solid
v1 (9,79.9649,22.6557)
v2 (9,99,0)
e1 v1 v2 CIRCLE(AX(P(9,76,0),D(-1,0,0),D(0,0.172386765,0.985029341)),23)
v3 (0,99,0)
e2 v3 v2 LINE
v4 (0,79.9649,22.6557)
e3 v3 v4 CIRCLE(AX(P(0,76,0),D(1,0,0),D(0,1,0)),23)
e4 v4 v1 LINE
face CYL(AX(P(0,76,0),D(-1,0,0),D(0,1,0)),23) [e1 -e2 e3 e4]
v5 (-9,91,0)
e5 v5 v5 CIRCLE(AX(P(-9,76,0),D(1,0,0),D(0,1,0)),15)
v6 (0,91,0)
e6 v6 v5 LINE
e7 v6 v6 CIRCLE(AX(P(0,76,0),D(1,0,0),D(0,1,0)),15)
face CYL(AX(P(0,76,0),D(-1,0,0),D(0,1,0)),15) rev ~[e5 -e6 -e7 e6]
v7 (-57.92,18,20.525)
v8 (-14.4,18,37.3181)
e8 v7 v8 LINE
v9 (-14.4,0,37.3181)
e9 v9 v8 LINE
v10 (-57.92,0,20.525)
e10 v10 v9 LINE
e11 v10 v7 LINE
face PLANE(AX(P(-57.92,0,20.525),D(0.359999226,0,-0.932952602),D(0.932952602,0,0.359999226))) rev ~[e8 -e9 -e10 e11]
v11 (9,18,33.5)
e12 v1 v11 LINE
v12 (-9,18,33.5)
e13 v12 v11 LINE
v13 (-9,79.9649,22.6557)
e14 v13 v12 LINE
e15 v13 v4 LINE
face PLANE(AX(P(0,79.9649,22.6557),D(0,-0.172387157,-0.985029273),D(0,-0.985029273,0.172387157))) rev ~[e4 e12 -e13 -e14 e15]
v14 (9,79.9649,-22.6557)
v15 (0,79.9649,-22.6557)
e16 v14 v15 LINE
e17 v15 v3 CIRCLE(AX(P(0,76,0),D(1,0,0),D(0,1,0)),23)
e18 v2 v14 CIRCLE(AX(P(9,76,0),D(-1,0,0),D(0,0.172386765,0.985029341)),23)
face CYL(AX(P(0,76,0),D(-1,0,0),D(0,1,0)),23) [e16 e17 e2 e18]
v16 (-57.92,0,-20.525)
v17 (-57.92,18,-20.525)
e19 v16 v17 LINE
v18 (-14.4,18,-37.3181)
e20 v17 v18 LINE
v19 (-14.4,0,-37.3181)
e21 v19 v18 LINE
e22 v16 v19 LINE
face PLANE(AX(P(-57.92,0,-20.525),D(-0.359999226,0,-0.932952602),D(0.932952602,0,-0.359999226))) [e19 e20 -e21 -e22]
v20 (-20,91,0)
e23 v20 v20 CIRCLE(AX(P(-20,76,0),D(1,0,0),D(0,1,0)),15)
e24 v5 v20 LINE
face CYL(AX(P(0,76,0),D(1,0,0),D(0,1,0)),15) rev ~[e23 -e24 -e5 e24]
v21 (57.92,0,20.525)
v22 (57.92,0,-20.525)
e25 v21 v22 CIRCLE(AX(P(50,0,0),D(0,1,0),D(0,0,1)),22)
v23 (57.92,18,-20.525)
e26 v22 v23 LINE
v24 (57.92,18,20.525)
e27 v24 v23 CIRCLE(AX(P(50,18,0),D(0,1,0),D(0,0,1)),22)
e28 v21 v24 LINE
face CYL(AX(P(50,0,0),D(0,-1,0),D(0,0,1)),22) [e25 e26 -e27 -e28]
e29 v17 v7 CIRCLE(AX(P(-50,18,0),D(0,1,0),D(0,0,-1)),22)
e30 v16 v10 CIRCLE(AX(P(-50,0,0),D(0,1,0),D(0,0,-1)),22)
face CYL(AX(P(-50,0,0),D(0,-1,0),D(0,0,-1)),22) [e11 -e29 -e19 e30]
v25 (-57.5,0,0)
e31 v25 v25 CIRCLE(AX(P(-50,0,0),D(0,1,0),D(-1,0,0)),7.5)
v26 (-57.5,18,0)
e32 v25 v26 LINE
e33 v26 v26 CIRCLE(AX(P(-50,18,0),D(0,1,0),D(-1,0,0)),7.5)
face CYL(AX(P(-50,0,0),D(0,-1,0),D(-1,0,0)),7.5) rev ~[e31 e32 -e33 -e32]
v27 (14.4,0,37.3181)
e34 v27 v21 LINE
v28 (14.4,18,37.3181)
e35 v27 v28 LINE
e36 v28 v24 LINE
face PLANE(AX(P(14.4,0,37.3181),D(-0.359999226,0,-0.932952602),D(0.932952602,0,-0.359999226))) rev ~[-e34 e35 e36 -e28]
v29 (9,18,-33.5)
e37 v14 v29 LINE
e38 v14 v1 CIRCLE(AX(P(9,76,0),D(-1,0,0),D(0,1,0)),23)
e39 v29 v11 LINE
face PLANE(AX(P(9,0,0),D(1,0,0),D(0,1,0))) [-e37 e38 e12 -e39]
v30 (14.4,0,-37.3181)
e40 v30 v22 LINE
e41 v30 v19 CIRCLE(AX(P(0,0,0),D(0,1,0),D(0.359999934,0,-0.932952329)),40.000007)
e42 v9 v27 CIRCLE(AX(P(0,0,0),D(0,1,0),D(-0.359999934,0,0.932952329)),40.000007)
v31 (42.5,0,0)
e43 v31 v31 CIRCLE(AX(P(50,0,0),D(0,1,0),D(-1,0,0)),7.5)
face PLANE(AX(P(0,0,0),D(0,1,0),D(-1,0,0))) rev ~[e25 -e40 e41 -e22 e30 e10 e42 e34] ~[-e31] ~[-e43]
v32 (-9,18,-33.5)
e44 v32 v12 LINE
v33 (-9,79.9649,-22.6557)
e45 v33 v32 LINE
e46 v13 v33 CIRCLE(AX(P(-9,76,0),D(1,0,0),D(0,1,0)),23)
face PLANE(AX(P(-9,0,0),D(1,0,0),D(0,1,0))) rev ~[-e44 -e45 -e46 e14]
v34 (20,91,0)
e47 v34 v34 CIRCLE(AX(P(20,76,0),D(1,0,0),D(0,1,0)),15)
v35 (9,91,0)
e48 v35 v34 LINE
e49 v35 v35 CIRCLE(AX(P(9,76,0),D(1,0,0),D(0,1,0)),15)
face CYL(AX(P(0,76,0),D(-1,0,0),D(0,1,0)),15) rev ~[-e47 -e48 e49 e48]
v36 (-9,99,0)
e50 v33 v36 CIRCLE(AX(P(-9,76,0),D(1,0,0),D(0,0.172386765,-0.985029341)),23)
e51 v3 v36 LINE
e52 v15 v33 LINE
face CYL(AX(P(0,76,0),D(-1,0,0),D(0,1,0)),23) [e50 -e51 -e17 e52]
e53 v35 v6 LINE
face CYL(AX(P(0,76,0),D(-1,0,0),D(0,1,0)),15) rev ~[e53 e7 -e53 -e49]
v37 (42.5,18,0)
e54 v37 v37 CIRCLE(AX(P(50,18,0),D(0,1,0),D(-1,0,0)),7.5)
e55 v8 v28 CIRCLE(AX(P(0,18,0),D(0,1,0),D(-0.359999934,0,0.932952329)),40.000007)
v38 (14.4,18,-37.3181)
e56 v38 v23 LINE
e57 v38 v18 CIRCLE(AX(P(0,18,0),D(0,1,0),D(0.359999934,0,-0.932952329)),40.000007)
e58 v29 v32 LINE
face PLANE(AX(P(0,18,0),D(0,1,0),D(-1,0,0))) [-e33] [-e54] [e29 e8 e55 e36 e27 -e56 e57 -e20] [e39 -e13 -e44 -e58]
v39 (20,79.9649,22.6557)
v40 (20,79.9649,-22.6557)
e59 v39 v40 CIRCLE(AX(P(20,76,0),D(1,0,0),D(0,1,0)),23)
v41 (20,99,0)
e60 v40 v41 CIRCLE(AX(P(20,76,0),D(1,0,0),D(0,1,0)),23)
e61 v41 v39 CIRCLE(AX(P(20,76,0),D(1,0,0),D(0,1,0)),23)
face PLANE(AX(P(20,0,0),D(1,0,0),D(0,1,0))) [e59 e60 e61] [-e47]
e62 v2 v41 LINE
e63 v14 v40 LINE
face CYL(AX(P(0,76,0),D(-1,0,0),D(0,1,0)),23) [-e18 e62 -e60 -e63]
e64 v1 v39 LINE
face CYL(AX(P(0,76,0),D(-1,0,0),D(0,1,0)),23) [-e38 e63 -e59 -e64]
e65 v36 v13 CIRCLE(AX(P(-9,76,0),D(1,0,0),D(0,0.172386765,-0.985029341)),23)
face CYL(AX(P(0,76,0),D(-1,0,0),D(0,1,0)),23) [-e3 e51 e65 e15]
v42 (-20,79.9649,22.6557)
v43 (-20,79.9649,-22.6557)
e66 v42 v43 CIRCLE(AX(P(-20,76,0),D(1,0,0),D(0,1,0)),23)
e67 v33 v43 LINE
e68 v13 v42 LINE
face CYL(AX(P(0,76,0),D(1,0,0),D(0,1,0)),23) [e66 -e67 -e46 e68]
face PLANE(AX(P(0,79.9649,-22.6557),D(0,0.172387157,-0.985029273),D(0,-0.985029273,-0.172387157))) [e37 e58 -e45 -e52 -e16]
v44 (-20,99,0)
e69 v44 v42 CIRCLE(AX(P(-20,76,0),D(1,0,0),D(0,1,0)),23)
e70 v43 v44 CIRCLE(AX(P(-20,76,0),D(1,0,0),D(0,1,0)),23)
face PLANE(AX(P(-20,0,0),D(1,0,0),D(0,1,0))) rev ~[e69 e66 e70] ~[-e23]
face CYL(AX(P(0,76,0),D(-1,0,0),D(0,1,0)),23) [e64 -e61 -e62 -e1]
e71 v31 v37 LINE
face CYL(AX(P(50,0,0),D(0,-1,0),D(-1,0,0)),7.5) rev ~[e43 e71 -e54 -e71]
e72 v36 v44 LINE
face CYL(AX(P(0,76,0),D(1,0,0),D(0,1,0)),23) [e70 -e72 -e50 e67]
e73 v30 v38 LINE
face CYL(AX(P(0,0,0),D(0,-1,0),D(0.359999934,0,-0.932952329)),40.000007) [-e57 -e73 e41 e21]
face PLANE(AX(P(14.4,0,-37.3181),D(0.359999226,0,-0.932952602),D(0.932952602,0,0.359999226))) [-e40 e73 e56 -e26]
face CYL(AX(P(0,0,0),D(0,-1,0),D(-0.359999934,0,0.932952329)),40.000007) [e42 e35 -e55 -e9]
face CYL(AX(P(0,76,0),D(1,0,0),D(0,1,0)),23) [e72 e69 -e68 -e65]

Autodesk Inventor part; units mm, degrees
ref_plane "YZ Plane" through (0, 0, 0) normal (1, 0, 0) x (0, 1, 0)
ref_plane "XZ Plane" through (0, 0, 0) normal (0, 1, 0) x (-1, 0, 0)
ref_plane "XY Plane" through (0, 0, 0) normal (0, 0, 1) x (1, 0, 0)
sketch "Sketch1" plane through (0, 0, 0) normal (0, 1, 0) x (-1, 0, 0)
  line L0 (50, 0) -> (-50, 0) construction
  line L1 (50, 22) -> (-50, 22)
  line L2 (-50, -22) -> (50, -22)
  arc A0 (50, -22) -> (50, 22) centre (50, 0) ccw
  arc A1 (-50, 22) -> (-50, -22) centre (-50, 0) ccw
  circle A2 centre (50, 0) radius 7.5
  circle A3 centre (-50, 0) radius 7.5
  line L3 (57.92, 20.525) -> (14.4, 37.3181)
  line L4 (-14.4, 37.3181) -> (-57.92, 20.525)
  line L5 (0, 0) -> (0, 42.8746) construction
  arc A4 (14.4, 37.3181) -> (-14.4, 37.3181) centre (0, 0) ccw
  line L6 (57.92, -20.525) -> (14.4, -37.3181)
  line L7 (-14.4, -37.3181) -> (-57.92, -20.525)
  line L8 (0, 0) -> (0, -42.8746) construction
  arc A5 (-14.4, -37.3181) -> (14.4, -37.3181) centre (0, 0) ccw
  point P0 (-57.92, -20.525)
  dimension "d0" = 100
  dimension "d1" = 40
  dimension "d2" = 15
  dimension "d3" = 22
extrude "Extrusion1" add sketch "Sketch1" along normal blind 18
sketch "Sketch2" plane through (0, 0, 0) normal (1, 0, 0) x (0, 1, 0)
  line L0 (0, 0) -> (76, 0) construction
  circle A0 centre (76, 0) radius 23
  circle A1 centre (76, 0) radius 15
  line L1 (18, -20.525) -> (18, -37.3181) construction
  line L2 (18, -37.3181) -> (18, -37.3181) construction
  line L3 (18, -37.3181) -> (18, -20.525) construction
  line L4 (18, -20.525) -> (18, 20.525) construction
  line L5 (18, 20.525) -> (18, 37.3181) construction
  line L6 (18, 37.3181) -> (18, 37.3181) construction
  line L7 (18, 37.3181) -> (18, 20.525) construction
  line L8 (18, 20.525) -> (18, -20.525) construction
  line L9 (18, 7.5) -> (18, -7.5) construction
  line L10 (18, 7.5) -> (18, -7.5) construction
  line L11 (79.9649, -22.6557) -> (18, -33.5)
  line L12 (79.9649, 22.6557) -> (18, 33.5)
  line L13 (18, -33.5) -> (18, 33.5)
  point P0 (79.9649, 22.6557)
  point P1 (18, 0)
  dimension "d8" = 46
  dimension "d7" = 67
  dimension "d9" = 30
  dimension "d14" = 116
extrude "Extrusion2" add sketch "Sketch2" along normal mid plane 18
extrude "Extrusion3" add sketch "Sketch2" along normal mid plane 40 contours A0
properties part number "ShaftSupport"
